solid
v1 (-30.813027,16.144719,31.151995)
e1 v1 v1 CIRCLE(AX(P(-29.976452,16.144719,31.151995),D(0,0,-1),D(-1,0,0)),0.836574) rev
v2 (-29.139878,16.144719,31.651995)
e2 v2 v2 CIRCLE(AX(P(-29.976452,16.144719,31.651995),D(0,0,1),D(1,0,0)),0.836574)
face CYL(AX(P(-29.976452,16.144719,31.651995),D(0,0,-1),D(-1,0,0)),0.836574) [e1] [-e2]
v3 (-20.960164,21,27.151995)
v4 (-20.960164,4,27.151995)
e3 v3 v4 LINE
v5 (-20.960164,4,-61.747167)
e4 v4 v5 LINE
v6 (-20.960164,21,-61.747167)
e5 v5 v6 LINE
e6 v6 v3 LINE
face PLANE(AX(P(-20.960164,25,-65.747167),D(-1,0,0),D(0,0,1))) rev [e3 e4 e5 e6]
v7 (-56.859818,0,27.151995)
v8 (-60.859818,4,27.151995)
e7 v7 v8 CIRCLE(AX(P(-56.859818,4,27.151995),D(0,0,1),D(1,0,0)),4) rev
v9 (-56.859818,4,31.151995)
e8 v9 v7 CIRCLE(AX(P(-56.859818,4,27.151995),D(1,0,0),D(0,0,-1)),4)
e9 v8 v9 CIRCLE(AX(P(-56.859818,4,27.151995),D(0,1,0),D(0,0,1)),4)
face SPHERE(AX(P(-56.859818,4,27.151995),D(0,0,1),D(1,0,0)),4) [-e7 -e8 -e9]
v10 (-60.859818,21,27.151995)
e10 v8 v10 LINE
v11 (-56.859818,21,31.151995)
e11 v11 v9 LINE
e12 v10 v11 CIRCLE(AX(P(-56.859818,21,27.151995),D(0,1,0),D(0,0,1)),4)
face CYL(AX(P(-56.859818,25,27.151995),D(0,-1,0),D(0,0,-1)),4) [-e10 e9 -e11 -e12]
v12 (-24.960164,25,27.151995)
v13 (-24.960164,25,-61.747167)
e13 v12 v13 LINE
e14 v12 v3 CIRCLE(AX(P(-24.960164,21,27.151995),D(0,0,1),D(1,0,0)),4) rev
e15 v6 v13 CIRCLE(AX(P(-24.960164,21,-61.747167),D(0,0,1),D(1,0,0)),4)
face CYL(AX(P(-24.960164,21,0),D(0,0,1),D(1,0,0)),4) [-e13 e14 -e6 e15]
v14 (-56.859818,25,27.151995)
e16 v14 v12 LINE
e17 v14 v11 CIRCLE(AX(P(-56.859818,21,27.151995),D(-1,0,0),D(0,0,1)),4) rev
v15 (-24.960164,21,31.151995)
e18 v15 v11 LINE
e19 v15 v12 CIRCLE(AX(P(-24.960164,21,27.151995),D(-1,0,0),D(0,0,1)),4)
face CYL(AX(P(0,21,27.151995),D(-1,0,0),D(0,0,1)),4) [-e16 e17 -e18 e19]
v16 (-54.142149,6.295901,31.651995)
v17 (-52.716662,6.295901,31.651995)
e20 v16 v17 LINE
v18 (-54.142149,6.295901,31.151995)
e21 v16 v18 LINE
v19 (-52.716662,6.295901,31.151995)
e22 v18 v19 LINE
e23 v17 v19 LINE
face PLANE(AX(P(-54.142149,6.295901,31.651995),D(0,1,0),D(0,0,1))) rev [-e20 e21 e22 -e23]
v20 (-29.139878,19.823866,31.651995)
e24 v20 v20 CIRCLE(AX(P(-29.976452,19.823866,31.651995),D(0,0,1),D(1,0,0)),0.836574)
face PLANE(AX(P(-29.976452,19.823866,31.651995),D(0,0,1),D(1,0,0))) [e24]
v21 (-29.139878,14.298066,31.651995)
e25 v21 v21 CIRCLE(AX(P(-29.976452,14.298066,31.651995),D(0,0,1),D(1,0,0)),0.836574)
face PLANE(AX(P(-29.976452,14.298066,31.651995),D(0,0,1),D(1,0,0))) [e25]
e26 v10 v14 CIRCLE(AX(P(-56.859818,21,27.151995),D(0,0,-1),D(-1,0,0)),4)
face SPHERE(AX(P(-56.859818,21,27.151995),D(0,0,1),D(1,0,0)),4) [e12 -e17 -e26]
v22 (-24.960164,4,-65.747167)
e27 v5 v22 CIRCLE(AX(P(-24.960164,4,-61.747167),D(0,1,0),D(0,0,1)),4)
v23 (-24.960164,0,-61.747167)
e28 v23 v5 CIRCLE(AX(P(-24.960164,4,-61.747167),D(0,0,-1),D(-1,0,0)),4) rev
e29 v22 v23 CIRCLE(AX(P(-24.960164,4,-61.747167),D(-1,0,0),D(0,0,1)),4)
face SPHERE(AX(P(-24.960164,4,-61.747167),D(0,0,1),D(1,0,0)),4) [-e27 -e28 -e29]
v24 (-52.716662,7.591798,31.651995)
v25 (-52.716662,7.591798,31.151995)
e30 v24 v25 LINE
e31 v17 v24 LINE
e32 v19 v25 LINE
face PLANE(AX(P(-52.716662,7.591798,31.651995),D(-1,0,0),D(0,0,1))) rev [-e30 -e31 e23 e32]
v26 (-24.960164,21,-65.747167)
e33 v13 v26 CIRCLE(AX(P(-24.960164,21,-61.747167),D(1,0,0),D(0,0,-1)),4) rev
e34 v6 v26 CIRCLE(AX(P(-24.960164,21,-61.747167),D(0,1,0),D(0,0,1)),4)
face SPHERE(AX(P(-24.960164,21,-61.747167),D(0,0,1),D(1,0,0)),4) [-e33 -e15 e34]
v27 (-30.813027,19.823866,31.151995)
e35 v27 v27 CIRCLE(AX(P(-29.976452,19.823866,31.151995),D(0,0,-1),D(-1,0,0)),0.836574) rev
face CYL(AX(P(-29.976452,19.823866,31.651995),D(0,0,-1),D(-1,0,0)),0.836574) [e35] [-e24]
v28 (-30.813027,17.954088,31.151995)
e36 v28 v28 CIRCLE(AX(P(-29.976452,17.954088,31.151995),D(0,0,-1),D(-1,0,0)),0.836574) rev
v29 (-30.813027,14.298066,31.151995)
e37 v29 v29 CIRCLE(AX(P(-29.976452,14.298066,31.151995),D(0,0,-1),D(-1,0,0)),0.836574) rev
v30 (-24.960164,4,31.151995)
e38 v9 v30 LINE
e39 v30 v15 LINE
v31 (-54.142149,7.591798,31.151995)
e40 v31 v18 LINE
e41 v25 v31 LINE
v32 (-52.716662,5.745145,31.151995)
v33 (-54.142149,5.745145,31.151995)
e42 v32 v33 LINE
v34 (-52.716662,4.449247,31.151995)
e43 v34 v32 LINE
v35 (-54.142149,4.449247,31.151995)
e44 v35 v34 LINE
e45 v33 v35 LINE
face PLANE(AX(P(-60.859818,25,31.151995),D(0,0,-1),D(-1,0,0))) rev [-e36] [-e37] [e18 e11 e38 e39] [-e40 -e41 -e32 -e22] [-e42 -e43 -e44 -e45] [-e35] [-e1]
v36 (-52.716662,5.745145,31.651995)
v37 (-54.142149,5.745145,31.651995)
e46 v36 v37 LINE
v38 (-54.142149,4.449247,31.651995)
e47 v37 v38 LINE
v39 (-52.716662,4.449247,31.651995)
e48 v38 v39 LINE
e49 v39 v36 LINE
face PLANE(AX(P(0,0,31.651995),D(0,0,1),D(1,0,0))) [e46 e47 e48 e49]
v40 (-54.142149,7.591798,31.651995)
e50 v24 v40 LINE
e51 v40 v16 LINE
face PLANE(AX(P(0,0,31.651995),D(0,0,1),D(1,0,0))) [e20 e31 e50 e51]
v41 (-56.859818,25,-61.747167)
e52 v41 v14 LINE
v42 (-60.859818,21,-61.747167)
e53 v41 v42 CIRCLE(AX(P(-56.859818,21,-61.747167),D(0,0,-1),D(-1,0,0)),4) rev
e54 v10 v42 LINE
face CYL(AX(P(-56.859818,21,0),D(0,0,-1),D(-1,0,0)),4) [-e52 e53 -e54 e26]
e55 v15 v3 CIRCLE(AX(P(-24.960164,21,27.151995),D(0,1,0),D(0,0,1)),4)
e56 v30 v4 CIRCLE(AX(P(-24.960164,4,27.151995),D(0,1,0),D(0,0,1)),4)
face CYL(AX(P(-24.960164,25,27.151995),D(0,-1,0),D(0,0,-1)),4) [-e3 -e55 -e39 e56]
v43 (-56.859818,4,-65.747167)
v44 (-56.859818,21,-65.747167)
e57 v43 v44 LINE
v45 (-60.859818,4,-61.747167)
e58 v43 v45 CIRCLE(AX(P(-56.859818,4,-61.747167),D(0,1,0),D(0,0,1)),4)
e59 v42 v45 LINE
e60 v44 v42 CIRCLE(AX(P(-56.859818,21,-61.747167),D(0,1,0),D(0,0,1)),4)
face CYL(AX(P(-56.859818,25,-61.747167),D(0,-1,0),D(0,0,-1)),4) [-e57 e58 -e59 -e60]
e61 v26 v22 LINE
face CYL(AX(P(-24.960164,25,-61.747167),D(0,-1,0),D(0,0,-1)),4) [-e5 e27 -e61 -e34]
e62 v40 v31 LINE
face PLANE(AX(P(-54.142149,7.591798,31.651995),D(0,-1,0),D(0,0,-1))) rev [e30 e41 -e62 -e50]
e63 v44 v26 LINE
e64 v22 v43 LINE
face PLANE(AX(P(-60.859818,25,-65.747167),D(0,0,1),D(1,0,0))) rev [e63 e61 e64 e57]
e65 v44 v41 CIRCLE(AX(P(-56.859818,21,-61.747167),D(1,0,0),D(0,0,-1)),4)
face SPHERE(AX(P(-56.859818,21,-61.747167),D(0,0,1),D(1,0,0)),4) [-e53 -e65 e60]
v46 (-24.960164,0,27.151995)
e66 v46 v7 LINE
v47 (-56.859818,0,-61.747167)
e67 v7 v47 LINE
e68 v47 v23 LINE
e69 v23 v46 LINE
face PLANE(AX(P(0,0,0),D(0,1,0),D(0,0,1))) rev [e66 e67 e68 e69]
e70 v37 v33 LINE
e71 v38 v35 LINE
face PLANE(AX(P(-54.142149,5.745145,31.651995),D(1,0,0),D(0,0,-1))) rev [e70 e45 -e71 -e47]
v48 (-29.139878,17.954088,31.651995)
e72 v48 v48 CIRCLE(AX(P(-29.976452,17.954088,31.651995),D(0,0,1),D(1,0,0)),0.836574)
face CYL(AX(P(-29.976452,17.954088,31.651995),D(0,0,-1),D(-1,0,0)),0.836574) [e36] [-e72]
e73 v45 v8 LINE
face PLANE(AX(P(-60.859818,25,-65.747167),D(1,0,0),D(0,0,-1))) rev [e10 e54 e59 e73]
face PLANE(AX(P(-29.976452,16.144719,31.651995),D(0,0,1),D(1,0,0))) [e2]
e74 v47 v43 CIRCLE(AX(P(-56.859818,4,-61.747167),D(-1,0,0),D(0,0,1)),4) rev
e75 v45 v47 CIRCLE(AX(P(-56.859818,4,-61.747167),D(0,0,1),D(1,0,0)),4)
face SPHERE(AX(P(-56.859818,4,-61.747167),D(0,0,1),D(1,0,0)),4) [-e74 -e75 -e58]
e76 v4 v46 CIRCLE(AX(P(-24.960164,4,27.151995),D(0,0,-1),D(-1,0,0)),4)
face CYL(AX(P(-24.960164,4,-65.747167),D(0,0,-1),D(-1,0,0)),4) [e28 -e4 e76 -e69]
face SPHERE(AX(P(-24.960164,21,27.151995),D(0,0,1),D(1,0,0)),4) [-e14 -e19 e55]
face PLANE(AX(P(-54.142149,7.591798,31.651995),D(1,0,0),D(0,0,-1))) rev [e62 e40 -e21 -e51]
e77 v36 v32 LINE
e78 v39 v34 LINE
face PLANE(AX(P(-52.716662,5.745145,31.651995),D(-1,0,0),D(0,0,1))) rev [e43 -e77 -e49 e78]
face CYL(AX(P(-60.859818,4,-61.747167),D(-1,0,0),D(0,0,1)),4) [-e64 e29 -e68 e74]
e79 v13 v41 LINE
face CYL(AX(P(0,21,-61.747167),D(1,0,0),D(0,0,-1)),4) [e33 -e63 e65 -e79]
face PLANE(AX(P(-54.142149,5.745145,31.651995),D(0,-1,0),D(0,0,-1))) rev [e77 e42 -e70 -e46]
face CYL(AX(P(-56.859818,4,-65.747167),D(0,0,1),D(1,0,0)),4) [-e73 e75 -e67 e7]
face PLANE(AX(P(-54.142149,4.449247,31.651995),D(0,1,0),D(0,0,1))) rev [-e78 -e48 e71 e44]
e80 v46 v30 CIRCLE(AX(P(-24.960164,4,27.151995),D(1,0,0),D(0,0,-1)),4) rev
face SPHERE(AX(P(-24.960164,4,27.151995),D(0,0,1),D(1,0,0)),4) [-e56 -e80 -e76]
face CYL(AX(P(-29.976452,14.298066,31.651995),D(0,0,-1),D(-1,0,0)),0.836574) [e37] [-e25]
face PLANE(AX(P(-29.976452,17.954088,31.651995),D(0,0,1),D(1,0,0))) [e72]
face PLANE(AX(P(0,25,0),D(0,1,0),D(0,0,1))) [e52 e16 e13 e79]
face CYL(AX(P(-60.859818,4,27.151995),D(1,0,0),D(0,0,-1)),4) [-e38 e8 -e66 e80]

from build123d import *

# Parameters (mm, degrees)
SKETCH1_W           = 39.899654891
SKETCH1_H           = 96.899161878
BOSS_EXTRUDE1_DEPTH = 25
FILLET4_R           = 4
FILLET5_R           = 4
SKETCH11_R          = 0.836574299
SKETCH11_W          = 1.425486882
SKETCH11_H          = 1.295897166
BOSS_EXTRUDE2_DEPTH = 0.5


with BuildPart() as part:
    # Sketch1 → Boss-Extrude1 (new body)
    with BuildSketch(Plane(origin=(0, 0, 0), x_dir=(1, 0, 0), z_dir=(0, 1, 0))):
        with Locations((-40.909991022, 17.297585728)):
            Rectangle(SKETCH1_W, SKETCH1_H)
    extrude(amount=BOSS_EXTRUDE1_DEPTH)

    # Fillet4
    fillet4_edges = [part.edges().sort_by_distance(p)[0] for p in [
        (-20.960163576, 25, -17.297585728),
        (-40.909991022, 25, -65.747166667),
        (-60.859818467, 25, -17.297585728),
        (-40.909991022, 0, -65.747166667),
        (-20.960163576, 0, -17.297585728),
        (-40.909991022, 0, 31.151995211),
        (-60.859818467, 0, -17.297585728),
        (-40.909991022, 25, 31.151995211),
    ]]
    fillet(fillet4_edges, radius=FILLET4_R)

    # Fillet5
    # the kernel refuses this fillet: 4 mm, written as the material it takes off along each edge
    with BuildSketch(Plane(origin=(-56.859818467, 4, -61.747166667), x_dir=(-1, 0, 0), z_dir=(0, 0, -1))) as fillet5_piece_1_section:
        Polygon((0, 0), (FILLET5_R, 0), (FILLET5_R, -FILLET5_R), (0, -FILLET5_R), align=None)
    fillet5_piece_1 = extrude(amount=FILLET5_R, mode=Mode.PRIVATE)
    fillet5_piece_1 = fillet5_piece_1 - Plane(origin=(-56.859818467, 4, -61.747166667), x_dir=(0.7071067811865475, 0.7071067811865475, 0), z_dir=(0, 0, -1)) * Sphere(FILLET5_R, mode=Mode.PRIVATE)
    add(fillet5_piece_1, mode=Mode.SUBTRACT)
    with BuildSketch(Plane(origin=(-24.960163576, 4, -61.747166667), x_dir=(1, 0, 0), z_dir=(0, 0, -1))) as fillet5_piece_2_section:
        Polygon((0, 0), (FILLET5_R, 0), (FILLET5_R, FILLET5_R), (0, FILLET5_R), align=None)
    fillet5_piece_2 = extrude(amount=FILLET5_R, mode=Mode.PRIVATE)
    fillet5_piece_2 = fillet5_piece_2 - Plane(origin=(-24.960163576, 4, -61.747166667), x_dir=(-0.7071067811865475, 0.7071067811865475, 0), z_dir=(0, 0, -1)) * Sphere(FILLET5_R, mode=Mode.PRIVATE)
    add(fillet5_piece_2, mode=Mode.SUBTRACT)
    with BuildSketch(Plane(origin=(-56.859818467, 4, 27.151995211), x_dir=(0, 0, 1), z_dir=(-1, 0, 0))) as fillet5_piece_3_section:
        Polygon((0, 0), (FILLET5_R, 0), (FILLET5_R, -FILLET5_R), (0, -FILLET5_R), align=None)
    fillet5_piece_3 = extrude(amount=FILLET5_R, mode=Mode.PRIVATE)
    fillet5_piece_3 = fillet5_piece_3 - Plane(origin=(-56.859818467, 4, 27.151995211), x_dir=(0, 0.7071067811865475, -0.7071067811865475), z_dir=(-1, 0, 0)) * Sphere(FILLET5_R, mode=Mode.PRIVATE)
    add(fillet5_piece_3, mode=Mode.SUBTRACT)
    with BuildSketch(Plane(origin=(-24.960163576, 4, 27.151995211), x_dir=(0, 0, 1), z_dir=(1, 0, 0))) as fillet5_piece_4_section:
        Polygon((0, 0), (FILLET5_R, 0), (FILLET5_R, FILLET5_R), (0, FILLET5_R), align=None)
    fillet5_piece_4 = extrude(amount=FILLET5_R, mode=Mode.PRIVATE)
    fillet5_piece_4 = fillet5_piece_4 - Plane(origin=(-24.960163576, 4, 27.151995211), x_dir=(0, 0.7071067811865475, -0.7071067811865475), z_dir=(1, 0, 0)) * Sphere(FILLET5_R, mode=Mode.PRIVATE)
    add(fillet5_piece_4, mode=Mode.SUBTRACT)
    with BuildSketch(Plane(origin=(-24.960163576, 21, 27.151995211), x_dir=(0, 0, 1), z_dir=(1, 0, 0))) as fillet5_piece_5_section:
        Polygon((0, 0), (FILLET5_R, 0), (FILLET5_R, -FILLET5_R), (0, -FILLET5_R), align=None)
    fillet5_piece_5 = extrude(amount=FILLET5_R, mode=Mode.PRIVATE)
    fillet5_piece_5 = fillet5_piece_5 - Plane(origin=(-24.960163576, 21, 27.151995211), x_dir=(0, -0.7071067811865475, -0.7071067811865475), z_dir=(1, 0, 0)) * Sphere(FILLET5_R, mode=Mode.PRIVATE)
    add(fillet5_piece_5, mode=Mode.SUBTRACT)
    with BuildSketch(Plane(origin=(-56.859818467, 21, 27.151995211), x_dir=(0, 0, 1), z_dir=(-1, 0, 0))) as fillet5_piece_6_section:
        Polygon((0, 0), (FILLET5_R, 0), (FILLET5_R, FILLET5_R), (0, FILLET5_R), align=None)
    fillet5_piece_6 = extrude(amount=FILLET5_R, mode=Mode.PRIVATE)
    fillet5_piece_6 = fillet5_piece_6 - Plane(origin=(-56.859818467, 21, 27.151995211), x_dir=(0, -0.7071067811865475, -0.7071067811865475), z_dir=(-1, 0, 0)) * Sphere(FILLET5_R, mode=Mode.PRIVATE)
    add(fillet5_piece_6, mode=Mode.SUBTRACT)
    with BuildSketch(Plane(origin=(-24.960163576, 21, -61.747166667), x_dir=(1, 0, 0), z_dir=(0, 0, -1))) as fillet5_piece_7_section:
        Polygon((0, 0), (FILLET5_R, 0), (FILLET5_R, -FILLET5_R), (0, -FILLET5_R), align=None)
    fillet5_piece_7 = extrude(amount=FILLET5_R, mode=Mode.PRIVATE)
    fillet5_piece_7 = fillet5_piece_7 - Plane(origin=(-24.960163576, 21, -61.747166667), x_dir=(-0.7071067811865475, -0.7071067811865475, 0), z_dir=(0, 0, -1)) * Sphere(FILLET5_R, mode=Mode.PRIVATE)
    add(fillet5_piece_7, mode=Mode.SUBTRACT)
    with BuildSketch(Plane(origin=(-56.859818467, 21, -61.747166667), x_dir=(-1, 0, 0), z_dir=(0, 0, -1))) as fillet5_piece_8_section:
        Polygon((0, 0), (FILLET5_R, 0), (FILLET5_R, FILLET5_R), (0, FILLET5_R), align=None)
    fillet5_piece_8 = extrude(amount=FILLET5_R, mode=Mode.PRIVATE)
    fillet5_piece_8 = fillet5_piece_8 - Plane(origin=(-56.859818467, 21, -61.747166667), x_dir=(0.7071067811865475, -0.7071067811865475, 0), z_dir=(0, 0, -1)) * Sphere(FILLET5_R, mode=Mode.PRIVATE)
    add(fillet5_piece_8, mode=Mode.SUBTRACT)
    with BuildSketch(Plane(origin=(-20.960163576, 4, 31.151995211), x_dir=(0, 0, -1), z_dir=(0, 1, 0)), Plane(origin=(-20.960163576, 4, -65.747166667), x_dir=(-1, 0, 0), z_dir=(0, 1, 0))) as fillet5_piece_9:
        with BuildLine():
            CenterArc((FILLET5_R, FILLET5_R), FILLET5_R, 180, 90)
            Line((0, FILLET5_R), (0, 0))
            Line((0, 0), (FILLET5_R, 0))
        make_face()
    extrude(amount=17, mode=Mode.SUBTRACT)
    with BuildSketch(Plane(origin=(-60.859818467, 4, 31.151995211), x_dir=(0, 0, -1), z_dir=(0, 1, 0)), Plane(origin=(-60.859818467, 4, -65.747166667), x_dir=(1, 0, 0), z_dir=(0, 1, 0))) as fillet5_piece_10:
        with BuildLine():
            CenterArc((FILLET5_R, -FILLET5_R), FILLET5_R, 90, 90)
            Line((0, -FILLET5_R), (0, 0))
            Line((0, 0), (FILLET5_R, 0))
        make_face()
    extrude(amount=17, mode=Mode.SUBTRACT)

    # Sketch11 → Boss-Extrude2 (add)
    with BuildSketch(Plane.XY.offset(31.151995211)):
        with Locations(Location((-29.976452447, 19.823866424, 0), (0, 0, 180))):
            Circle(SKETCH11_R)
        with Locations(Location((-29.976452447, 17.95408771, 0), (0, 0, 180))):
            Circle(SKETCH11_R)
        with Locations(Location((-29.976452447, 14.298065843, 0), (0, 0, 180))):
            Circle(SKETCH11_R)
        with Locations(Location((-29.976452447, 16.144719304, 0), (0, 0, 180))):
            Circle(SKETCH11_R)
        with Locations((-53.429405659, 5.097195967)):
            Rectangle(SKETCH11_W, SKETCH11_H)
        with Locations((-53.429405659, 6.943849428)):
            Rectangle(SKETCH11_W, SKETCH11_H)
    extrude(amount=BOSS_EXTRUDE2_DEPTH)


solid = part.part
